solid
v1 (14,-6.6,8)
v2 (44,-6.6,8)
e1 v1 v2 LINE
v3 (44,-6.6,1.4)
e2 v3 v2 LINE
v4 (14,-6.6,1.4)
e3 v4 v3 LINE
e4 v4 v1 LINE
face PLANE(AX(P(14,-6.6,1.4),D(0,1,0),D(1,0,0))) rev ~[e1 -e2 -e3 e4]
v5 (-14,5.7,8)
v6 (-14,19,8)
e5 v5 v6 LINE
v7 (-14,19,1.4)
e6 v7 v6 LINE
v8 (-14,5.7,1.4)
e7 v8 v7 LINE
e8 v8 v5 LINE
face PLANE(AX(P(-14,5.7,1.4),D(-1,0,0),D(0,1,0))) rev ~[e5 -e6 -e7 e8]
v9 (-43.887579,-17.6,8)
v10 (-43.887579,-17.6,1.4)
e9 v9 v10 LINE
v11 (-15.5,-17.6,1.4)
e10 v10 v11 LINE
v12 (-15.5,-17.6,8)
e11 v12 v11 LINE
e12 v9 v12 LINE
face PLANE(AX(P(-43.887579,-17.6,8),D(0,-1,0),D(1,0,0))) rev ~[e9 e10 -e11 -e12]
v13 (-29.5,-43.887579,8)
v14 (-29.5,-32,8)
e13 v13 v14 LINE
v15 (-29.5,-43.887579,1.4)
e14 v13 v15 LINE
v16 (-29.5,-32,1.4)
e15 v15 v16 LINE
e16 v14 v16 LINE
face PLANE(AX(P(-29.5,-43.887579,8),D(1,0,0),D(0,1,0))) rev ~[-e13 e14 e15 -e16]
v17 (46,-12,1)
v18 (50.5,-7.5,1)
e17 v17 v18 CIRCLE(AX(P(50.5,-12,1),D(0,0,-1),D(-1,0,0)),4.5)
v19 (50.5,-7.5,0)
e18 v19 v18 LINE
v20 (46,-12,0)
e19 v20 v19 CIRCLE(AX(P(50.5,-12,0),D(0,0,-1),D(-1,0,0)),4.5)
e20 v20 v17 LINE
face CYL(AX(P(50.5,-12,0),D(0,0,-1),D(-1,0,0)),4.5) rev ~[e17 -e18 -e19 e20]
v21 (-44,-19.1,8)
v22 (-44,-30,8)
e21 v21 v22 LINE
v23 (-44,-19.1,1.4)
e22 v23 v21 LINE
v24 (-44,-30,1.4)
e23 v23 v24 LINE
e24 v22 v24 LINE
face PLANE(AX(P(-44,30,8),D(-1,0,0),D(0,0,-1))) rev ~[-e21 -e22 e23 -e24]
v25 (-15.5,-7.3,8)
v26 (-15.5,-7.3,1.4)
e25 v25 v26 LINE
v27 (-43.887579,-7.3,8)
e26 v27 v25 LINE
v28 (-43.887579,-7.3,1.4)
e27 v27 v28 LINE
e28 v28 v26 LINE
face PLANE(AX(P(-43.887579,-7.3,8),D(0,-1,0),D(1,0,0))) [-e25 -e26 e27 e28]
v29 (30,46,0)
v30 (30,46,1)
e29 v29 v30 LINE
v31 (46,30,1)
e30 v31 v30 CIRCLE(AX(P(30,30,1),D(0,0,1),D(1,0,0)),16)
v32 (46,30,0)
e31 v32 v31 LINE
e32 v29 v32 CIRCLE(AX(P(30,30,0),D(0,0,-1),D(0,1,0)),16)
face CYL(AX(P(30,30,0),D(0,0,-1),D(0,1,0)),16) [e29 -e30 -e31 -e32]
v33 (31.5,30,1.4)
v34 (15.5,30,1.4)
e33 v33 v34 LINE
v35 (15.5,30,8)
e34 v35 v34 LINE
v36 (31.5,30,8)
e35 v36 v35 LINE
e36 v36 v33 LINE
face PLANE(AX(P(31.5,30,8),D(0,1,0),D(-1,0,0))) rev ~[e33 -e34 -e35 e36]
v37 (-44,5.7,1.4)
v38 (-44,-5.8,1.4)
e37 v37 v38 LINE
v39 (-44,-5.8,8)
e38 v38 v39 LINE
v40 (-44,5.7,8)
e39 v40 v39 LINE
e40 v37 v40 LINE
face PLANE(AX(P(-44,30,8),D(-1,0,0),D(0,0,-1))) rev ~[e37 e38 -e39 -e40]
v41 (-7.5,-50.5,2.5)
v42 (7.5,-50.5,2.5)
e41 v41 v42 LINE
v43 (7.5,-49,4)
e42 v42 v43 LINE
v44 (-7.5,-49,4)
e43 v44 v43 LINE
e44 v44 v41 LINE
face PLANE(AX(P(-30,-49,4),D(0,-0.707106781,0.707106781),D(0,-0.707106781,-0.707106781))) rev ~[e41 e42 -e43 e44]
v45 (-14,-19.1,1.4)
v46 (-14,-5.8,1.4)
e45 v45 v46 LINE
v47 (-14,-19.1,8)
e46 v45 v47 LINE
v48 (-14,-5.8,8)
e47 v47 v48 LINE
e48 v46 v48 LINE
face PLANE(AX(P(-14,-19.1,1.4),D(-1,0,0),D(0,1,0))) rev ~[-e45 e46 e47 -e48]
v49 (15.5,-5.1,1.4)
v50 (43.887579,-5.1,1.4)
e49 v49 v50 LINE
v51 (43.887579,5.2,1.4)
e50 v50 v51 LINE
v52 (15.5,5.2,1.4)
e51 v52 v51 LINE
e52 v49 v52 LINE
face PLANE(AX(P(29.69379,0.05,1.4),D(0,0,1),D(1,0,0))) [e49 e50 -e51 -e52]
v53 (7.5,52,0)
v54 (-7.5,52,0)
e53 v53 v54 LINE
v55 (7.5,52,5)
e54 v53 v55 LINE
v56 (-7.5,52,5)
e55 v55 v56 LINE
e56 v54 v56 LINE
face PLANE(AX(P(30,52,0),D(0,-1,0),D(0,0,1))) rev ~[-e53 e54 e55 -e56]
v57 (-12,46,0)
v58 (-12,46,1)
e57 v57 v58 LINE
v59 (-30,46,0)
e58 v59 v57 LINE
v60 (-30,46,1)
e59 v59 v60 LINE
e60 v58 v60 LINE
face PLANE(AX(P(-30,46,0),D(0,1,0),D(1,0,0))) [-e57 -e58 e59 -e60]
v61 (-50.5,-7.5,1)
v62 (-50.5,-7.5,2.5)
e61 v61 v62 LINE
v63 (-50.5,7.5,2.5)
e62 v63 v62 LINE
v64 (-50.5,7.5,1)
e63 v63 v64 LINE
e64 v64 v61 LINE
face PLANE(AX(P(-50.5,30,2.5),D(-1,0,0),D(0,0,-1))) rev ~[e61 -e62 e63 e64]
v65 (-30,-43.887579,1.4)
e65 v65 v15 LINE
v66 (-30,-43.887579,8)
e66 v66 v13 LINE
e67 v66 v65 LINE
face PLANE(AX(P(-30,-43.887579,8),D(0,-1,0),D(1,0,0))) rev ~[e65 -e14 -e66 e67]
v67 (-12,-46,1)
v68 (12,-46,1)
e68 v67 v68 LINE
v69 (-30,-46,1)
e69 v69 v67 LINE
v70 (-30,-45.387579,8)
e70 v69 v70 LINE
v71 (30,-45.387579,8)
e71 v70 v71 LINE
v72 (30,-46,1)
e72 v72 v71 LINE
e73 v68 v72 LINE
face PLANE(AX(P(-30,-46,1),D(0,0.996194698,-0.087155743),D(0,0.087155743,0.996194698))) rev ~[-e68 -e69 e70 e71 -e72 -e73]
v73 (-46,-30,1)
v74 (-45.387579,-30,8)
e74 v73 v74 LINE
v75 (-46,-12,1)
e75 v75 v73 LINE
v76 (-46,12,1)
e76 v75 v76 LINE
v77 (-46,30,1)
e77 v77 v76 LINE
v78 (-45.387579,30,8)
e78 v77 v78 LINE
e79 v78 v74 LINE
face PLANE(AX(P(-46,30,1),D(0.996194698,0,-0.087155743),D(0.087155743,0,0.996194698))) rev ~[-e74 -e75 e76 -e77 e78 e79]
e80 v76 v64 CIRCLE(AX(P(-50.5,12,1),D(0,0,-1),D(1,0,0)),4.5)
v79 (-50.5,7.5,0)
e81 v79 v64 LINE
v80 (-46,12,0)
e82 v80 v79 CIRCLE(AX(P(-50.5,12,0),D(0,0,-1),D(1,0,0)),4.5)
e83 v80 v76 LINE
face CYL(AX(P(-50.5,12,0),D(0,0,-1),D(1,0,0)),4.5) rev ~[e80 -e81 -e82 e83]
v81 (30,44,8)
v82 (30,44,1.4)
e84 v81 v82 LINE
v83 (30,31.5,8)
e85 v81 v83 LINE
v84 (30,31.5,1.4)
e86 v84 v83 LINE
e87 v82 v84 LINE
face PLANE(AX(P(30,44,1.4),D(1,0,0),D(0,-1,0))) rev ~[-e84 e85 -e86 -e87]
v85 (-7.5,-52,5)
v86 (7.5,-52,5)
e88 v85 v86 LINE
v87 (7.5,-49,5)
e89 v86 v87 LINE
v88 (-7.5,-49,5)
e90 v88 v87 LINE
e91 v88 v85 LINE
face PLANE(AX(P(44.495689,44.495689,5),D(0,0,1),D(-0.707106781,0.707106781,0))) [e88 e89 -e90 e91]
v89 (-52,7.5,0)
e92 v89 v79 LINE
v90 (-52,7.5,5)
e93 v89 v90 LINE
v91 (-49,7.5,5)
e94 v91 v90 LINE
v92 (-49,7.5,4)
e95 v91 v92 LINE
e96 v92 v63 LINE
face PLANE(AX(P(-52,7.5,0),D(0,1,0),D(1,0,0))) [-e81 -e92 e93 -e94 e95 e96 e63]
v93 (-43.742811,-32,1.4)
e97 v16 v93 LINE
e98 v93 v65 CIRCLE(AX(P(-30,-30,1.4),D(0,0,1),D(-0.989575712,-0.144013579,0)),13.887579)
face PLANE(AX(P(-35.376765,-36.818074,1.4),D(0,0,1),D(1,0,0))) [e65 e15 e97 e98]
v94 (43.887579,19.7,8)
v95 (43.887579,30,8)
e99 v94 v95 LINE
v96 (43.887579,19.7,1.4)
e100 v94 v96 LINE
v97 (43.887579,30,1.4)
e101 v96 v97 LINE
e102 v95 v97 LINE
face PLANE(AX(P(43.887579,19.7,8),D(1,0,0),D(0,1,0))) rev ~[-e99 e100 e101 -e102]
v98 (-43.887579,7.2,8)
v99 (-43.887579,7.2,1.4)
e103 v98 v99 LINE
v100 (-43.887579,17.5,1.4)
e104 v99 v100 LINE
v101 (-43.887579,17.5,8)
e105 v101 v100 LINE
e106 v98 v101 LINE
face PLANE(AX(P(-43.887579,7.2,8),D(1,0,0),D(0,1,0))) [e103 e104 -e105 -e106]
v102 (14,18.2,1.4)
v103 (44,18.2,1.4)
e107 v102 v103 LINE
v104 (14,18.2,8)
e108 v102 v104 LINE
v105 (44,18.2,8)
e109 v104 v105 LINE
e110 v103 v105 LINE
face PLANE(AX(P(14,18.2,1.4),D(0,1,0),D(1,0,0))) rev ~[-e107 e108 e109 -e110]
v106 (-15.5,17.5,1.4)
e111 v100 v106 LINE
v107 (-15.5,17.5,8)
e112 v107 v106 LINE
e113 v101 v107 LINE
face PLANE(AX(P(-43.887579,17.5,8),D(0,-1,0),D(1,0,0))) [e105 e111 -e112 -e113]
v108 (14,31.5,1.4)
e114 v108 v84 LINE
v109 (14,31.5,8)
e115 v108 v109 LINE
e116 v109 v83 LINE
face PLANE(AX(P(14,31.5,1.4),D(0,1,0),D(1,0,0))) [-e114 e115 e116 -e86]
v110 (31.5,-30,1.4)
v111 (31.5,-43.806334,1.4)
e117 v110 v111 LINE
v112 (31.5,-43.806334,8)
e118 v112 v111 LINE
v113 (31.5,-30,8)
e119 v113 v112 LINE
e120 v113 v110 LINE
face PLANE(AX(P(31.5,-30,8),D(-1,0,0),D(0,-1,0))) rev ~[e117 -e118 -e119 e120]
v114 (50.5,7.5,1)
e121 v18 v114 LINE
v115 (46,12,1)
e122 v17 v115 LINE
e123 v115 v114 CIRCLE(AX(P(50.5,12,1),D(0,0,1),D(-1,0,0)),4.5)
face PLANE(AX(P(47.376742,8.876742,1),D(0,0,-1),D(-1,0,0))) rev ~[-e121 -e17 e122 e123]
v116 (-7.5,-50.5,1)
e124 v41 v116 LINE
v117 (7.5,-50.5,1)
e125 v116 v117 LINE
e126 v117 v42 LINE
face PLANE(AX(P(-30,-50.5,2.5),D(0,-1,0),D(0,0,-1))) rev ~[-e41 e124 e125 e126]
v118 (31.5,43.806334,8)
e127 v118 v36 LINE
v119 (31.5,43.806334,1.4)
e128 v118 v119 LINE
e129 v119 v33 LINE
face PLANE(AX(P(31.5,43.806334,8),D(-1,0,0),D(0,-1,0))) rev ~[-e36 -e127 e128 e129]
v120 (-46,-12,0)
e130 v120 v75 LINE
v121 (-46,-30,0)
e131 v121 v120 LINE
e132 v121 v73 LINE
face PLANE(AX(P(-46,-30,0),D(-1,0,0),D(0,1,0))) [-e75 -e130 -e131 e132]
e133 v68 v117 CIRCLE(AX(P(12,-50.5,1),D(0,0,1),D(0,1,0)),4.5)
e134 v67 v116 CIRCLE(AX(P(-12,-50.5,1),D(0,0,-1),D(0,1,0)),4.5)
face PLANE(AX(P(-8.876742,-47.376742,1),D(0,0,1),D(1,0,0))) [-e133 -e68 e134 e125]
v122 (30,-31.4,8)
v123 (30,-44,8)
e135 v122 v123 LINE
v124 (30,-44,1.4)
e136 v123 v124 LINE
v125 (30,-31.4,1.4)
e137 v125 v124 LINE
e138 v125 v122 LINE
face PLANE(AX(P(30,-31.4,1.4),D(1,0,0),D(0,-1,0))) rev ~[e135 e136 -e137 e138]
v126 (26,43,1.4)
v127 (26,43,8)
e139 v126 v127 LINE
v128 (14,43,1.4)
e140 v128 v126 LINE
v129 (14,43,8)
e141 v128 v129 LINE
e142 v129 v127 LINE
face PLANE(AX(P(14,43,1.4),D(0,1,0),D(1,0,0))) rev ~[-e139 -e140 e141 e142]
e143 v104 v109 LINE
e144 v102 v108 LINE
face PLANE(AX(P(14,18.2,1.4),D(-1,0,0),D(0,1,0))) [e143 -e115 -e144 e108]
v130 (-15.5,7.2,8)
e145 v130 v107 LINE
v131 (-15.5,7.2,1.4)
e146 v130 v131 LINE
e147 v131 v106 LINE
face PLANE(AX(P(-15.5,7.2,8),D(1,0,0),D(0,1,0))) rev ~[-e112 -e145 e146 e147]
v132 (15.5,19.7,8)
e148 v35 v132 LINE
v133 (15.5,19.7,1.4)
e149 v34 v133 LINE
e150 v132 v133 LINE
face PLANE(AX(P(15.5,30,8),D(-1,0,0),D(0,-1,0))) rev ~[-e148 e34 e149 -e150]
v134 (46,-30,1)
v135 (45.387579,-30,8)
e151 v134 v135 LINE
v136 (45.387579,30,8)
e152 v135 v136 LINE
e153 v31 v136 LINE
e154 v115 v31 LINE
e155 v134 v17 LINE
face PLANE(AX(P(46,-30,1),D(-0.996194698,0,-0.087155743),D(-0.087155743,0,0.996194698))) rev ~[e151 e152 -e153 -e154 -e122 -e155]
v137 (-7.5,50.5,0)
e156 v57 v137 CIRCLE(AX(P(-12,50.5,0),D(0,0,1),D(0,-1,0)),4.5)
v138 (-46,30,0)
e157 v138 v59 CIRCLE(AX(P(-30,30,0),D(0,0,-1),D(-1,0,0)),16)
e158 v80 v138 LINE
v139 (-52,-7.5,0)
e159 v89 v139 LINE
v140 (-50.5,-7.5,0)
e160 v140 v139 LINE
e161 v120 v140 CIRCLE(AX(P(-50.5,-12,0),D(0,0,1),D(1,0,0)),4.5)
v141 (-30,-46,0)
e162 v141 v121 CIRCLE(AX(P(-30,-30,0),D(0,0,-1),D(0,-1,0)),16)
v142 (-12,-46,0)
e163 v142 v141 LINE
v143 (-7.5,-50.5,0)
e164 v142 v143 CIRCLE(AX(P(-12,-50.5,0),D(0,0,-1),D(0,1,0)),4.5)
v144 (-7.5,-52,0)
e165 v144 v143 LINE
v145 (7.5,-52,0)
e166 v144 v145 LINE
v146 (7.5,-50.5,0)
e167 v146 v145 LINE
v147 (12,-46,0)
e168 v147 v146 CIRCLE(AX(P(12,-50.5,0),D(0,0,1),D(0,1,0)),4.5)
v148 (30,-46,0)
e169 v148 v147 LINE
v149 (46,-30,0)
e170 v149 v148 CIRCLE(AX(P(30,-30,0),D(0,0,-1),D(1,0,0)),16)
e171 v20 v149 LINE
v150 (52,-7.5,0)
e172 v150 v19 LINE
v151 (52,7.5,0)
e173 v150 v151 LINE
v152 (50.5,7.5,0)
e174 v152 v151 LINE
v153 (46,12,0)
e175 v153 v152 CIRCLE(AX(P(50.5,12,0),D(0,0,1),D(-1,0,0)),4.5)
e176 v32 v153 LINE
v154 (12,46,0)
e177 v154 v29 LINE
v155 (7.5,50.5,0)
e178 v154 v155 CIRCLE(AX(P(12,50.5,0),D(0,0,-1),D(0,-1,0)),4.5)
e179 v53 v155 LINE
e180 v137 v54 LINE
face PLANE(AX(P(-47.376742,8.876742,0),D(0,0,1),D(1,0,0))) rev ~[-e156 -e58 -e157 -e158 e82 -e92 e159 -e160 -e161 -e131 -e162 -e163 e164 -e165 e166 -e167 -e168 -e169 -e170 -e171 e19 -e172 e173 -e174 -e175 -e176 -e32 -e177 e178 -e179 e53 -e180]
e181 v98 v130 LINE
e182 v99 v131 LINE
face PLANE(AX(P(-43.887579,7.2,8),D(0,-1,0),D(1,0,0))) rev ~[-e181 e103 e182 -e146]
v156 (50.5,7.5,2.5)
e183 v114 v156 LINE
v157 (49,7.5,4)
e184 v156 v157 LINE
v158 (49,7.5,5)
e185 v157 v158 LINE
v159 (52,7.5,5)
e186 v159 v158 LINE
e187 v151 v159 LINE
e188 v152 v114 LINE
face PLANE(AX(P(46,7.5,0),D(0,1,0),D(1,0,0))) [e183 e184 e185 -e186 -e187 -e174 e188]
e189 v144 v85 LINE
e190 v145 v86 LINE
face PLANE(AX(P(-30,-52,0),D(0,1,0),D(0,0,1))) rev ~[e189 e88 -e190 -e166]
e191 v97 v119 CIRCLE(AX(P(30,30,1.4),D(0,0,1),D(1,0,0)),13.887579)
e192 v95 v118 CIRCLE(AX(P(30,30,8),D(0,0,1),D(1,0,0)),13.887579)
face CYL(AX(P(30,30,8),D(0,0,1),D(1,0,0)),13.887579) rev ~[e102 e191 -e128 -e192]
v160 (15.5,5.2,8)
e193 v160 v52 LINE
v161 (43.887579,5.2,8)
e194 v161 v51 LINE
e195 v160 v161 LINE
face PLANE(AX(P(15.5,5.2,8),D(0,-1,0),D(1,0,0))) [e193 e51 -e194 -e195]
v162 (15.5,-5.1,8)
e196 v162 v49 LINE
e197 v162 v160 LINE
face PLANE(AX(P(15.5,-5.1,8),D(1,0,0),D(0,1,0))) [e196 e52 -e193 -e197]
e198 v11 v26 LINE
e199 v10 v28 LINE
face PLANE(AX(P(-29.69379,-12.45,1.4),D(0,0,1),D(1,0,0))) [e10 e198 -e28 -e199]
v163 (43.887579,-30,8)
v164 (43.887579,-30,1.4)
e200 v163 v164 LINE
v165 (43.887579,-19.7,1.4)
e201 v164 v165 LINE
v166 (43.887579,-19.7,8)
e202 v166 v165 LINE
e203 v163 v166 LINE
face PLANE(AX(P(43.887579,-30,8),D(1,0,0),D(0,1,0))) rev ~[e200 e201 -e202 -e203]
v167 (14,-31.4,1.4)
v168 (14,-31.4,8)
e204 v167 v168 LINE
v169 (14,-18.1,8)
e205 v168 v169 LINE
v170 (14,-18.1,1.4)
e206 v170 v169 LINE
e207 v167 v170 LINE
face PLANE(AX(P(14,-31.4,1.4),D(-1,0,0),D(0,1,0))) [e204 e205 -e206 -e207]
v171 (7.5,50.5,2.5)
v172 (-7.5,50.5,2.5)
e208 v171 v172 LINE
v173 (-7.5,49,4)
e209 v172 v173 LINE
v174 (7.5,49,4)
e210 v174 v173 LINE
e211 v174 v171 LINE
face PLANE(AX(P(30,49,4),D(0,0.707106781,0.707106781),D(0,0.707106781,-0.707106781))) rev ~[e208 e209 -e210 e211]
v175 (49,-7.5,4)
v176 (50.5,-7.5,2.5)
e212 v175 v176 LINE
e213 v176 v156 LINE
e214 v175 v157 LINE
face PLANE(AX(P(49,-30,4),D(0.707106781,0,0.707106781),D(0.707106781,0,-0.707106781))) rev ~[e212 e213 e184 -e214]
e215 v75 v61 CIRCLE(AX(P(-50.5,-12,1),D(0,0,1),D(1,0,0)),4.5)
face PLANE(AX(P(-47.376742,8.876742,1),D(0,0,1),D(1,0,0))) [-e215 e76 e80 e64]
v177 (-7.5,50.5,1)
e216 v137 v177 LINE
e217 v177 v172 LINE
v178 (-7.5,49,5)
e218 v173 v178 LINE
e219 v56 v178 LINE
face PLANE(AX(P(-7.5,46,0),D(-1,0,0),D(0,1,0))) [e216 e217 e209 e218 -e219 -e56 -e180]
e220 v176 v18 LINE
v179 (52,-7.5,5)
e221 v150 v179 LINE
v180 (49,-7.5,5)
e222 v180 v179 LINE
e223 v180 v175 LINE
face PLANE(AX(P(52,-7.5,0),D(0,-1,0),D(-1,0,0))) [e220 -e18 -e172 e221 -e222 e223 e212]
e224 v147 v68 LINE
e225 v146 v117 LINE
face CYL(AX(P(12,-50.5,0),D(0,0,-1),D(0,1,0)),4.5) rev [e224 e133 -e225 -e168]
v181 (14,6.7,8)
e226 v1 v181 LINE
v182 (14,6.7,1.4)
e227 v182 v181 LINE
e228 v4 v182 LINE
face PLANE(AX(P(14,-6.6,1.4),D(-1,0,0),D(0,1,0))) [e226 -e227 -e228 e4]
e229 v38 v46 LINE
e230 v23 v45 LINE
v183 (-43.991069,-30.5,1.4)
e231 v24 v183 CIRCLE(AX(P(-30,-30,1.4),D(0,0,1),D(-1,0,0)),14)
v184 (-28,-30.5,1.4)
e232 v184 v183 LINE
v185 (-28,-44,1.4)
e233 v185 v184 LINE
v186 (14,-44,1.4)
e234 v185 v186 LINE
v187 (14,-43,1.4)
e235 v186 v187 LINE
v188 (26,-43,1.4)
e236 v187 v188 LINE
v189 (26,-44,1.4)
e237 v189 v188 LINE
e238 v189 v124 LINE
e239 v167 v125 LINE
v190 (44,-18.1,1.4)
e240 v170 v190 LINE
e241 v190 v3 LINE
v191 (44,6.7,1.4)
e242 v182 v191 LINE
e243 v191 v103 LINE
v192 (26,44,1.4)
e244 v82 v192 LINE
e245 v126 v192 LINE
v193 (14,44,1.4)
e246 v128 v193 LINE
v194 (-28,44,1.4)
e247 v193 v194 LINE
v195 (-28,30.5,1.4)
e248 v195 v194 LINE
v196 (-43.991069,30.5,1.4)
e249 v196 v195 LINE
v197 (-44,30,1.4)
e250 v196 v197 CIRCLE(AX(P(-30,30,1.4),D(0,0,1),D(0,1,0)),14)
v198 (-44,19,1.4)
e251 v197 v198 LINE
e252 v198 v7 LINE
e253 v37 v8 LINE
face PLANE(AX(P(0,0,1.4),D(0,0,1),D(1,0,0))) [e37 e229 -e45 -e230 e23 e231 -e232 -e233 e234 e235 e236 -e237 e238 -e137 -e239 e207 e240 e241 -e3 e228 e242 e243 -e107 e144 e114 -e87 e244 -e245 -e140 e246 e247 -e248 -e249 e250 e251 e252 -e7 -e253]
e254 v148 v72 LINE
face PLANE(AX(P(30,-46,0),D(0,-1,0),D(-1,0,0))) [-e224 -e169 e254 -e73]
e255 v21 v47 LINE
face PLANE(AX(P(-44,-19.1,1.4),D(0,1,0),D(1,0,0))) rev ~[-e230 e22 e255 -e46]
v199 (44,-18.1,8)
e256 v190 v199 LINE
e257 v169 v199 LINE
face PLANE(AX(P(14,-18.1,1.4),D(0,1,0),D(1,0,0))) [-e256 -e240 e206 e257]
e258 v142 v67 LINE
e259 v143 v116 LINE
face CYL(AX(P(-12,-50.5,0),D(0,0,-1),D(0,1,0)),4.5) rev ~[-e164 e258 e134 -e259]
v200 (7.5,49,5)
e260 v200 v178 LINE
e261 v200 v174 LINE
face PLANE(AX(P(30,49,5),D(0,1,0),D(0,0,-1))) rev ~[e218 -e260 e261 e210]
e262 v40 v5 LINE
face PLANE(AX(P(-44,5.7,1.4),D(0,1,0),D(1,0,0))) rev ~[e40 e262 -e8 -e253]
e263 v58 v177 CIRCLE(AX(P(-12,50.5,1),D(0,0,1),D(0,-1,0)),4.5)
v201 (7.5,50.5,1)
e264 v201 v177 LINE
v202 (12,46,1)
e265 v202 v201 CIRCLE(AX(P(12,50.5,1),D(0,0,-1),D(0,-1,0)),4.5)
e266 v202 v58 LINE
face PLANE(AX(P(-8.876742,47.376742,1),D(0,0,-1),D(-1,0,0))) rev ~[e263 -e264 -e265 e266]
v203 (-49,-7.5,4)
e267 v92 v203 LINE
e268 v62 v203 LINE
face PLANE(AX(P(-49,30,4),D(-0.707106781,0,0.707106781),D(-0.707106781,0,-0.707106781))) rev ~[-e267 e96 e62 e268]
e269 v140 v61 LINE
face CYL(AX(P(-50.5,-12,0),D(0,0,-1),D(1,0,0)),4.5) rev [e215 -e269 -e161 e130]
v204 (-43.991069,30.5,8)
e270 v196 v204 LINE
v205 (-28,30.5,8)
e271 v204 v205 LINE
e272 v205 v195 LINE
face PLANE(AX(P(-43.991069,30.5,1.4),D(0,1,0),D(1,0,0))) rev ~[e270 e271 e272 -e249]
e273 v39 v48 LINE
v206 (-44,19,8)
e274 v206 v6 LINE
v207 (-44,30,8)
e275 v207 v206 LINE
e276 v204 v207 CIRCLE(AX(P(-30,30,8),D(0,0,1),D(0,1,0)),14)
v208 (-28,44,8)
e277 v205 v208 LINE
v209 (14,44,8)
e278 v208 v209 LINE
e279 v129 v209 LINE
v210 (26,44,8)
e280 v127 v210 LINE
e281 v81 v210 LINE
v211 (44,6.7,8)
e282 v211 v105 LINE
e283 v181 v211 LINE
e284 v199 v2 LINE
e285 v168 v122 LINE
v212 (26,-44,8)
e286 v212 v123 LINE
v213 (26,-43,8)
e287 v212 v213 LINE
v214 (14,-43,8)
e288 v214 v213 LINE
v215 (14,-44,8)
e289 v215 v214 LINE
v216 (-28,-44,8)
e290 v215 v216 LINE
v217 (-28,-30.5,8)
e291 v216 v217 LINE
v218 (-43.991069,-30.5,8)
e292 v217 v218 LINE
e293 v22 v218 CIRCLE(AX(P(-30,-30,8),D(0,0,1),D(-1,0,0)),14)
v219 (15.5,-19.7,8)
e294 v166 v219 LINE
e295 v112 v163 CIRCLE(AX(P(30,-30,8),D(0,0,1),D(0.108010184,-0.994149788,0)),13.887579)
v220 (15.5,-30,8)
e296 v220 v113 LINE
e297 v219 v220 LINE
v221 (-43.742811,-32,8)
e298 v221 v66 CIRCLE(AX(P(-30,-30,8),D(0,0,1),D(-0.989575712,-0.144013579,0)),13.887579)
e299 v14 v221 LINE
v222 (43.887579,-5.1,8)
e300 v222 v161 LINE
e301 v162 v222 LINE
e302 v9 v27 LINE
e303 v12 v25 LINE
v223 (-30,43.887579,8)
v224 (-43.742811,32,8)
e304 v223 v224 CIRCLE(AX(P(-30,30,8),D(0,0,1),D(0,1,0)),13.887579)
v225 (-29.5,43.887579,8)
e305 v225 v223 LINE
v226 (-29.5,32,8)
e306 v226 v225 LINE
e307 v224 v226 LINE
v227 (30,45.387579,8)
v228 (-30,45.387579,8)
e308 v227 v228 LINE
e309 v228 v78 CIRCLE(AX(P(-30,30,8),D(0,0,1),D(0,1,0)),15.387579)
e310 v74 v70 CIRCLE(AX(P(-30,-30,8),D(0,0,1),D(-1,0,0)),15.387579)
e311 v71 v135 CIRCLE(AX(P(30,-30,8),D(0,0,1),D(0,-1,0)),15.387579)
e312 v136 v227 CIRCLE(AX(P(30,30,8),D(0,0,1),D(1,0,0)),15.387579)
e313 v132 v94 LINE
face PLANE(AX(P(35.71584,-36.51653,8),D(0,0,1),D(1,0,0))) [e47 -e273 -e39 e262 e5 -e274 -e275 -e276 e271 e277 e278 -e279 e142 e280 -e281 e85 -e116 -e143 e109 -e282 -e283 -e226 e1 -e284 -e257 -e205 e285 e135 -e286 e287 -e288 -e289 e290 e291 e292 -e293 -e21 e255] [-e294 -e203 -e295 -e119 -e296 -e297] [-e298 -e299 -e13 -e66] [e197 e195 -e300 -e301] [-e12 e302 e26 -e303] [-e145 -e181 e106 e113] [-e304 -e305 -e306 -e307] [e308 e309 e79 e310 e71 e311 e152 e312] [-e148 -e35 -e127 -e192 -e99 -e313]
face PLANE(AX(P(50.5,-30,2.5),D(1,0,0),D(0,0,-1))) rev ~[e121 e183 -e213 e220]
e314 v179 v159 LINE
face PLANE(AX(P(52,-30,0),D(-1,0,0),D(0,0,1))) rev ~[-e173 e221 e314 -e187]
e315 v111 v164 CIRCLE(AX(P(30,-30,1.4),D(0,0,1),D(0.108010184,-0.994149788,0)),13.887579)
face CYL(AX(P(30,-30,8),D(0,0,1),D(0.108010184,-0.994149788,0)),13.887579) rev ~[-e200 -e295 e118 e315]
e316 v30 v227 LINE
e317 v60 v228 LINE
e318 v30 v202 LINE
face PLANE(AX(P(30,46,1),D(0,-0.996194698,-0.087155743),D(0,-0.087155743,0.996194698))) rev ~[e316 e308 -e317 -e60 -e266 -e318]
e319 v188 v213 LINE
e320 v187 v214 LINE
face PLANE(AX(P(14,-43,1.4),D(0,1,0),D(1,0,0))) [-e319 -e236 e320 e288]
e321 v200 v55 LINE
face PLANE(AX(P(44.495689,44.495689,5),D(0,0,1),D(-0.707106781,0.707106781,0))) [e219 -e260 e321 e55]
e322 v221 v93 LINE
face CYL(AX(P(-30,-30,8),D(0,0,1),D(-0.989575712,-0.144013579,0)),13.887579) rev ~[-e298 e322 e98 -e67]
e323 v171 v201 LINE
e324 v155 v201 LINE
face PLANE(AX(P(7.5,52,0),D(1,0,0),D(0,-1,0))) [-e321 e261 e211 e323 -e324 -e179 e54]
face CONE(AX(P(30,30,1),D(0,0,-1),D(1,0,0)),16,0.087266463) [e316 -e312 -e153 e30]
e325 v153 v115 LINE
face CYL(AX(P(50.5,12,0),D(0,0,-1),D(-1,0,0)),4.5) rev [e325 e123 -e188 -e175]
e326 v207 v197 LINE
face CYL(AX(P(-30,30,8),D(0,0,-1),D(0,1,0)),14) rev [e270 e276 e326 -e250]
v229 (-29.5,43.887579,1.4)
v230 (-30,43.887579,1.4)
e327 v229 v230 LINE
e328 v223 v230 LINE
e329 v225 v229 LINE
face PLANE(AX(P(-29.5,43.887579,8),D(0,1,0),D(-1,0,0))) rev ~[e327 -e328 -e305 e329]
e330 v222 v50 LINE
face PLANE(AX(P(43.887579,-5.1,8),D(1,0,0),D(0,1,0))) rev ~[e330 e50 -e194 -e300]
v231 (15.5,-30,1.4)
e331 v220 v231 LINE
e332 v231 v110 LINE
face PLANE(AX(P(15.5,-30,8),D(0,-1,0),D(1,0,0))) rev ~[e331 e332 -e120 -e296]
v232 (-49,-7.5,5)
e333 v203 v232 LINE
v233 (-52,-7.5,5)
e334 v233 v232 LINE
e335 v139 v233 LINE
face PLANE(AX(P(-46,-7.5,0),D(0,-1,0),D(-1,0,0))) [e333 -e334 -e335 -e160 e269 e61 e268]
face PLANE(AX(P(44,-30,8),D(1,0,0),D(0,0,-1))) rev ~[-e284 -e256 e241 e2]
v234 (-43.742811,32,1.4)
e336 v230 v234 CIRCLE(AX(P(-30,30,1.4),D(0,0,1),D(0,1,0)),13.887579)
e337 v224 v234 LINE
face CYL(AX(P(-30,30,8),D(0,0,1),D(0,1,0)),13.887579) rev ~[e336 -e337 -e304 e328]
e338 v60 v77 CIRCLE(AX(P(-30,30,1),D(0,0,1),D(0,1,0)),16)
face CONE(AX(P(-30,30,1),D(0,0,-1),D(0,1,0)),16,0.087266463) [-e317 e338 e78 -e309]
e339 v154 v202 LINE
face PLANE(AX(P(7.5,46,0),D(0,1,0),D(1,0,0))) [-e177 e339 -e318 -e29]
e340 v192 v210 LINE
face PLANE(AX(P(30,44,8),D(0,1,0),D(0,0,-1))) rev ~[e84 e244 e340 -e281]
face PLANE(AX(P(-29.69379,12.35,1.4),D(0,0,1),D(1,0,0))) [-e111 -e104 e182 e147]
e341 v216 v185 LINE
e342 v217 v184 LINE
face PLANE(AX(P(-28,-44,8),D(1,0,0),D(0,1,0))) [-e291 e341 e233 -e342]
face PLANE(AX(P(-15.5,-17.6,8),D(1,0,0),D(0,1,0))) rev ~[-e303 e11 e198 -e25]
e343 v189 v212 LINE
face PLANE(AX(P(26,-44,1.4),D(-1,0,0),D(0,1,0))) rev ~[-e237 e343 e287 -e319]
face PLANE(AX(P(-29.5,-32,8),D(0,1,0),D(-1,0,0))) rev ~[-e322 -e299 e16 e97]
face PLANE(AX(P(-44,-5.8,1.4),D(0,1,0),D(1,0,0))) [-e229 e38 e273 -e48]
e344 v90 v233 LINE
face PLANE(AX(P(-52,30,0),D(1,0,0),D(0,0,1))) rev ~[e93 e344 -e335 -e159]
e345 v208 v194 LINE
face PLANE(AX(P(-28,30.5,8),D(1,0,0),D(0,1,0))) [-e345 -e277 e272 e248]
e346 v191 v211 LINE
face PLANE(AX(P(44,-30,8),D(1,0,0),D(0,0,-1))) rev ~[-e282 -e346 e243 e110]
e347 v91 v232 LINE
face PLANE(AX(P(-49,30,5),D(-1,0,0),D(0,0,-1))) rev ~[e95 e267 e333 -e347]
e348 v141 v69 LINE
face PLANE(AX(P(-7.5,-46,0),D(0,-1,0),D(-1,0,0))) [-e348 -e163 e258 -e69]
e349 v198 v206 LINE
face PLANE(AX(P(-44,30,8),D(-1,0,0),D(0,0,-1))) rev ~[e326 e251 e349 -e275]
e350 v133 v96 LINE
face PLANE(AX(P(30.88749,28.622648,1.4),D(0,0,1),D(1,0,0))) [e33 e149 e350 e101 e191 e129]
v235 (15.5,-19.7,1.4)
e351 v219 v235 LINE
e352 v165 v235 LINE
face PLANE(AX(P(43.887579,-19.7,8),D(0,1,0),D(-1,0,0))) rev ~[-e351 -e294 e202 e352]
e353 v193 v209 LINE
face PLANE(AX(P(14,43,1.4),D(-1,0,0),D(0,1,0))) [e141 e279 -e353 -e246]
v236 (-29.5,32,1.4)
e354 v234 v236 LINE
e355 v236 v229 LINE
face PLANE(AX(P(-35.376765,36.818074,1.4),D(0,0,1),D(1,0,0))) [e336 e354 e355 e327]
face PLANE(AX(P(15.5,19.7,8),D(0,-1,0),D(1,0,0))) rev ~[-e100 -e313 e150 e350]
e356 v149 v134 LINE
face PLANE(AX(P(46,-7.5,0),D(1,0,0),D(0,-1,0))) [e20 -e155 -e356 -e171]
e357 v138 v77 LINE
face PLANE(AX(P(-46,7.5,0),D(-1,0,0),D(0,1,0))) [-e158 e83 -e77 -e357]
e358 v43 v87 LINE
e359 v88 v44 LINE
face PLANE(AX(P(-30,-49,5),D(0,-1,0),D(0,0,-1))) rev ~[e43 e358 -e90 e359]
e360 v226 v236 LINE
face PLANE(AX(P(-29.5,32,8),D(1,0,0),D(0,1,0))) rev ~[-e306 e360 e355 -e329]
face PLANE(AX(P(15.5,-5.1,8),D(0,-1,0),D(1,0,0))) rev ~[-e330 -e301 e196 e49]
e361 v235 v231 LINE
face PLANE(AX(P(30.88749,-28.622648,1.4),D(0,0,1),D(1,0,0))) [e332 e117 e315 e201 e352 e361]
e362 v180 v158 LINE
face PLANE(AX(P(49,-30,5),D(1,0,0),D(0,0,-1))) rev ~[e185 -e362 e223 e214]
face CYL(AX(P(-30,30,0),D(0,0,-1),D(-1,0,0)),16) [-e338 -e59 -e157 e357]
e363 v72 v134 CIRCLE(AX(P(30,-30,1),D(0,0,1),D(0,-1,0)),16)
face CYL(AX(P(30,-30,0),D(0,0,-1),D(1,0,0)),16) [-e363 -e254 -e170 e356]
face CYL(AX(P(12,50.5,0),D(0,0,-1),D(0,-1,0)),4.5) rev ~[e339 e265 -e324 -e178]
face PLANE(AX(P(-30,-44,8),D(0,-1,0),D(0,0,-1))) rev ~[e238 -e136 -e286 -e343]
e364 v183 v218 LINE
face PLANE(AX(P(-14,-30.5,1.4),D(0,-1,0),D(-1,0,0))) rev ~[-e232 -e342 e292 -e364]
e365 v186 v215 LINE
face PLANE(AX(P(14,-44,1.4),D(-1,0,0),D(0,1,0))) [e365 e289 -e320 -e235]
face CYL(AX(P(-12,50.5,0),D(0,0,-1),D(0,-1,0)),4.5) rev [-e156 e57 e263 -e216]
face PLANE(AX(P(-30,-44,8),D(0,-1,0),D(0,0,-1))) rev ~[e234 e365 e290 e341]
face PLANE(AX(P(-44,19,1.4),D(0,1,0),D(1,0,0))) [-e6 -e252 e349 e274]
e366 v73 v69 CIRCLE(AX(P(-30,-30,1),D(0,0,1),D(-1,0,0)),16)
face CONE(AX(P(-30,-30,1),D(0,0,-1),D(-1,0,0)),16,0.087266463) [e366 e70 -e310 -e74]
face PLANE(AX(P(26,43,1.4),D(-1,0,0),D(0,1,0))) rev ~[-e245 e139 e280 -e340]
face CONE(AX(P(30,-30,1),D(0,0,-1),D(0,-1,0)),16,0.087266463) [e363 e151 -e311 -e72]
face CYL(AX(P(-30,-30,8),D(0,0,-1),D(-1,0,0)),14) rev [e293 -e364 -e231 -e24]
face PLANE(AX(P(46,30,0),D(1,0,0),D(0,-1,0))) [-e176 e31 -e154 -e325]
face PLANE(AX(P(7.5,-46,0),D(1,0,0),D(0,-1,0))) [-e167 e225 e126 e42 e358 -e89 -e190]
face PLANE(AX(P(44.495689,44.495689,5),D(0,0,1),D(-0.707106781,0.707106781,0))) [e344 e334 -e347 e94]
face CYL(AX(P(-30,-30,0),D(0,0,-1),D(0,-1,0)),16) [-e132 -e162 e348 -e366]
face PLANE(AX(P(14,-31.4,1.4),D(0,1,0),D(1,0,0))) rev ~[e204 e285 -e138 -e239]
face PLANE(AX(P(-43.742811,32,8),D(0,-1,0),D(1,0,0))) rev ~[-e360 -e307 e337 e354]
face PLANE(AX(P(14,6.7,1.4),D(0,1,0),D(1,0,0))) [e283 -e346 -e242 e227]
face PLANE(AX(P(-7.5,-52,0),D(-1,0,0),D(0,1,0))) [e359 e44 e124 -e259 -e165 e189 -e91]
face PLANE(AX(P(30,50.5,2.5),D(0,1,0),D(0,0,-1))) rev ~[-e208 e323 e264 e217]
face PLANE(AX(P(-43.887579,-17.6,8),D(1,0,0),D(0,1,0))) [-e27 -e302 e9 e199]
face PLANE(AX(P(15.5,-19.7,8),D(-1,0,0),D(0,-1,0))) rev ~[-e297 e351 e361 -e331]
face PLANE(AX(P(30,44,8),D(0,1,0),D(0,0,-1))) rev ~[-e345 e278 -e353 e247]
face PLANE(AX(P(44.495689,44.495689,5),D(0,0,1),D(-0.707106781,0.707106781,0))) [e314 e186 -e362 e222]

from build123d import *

# Parameters (mm, degrees)
F4_DEPTH     = 1.4
F5_W         = 30
F5_H         = 13.3
F5_W_2       = 12
F5_H_2       = 1
F6_DEPTH     = 6.6
F8_DEPTH     = 6.6
F9_W         = 14
F9_H         = 13.5
F10_DEPTH    = 6.6
F11_W        = 28.3875793553
F11_H        = 10.3
F12_DEPTH    = 6.6
F14_DEPTH    = 5.001
F15_T1_DEPTH = 1


# Not quite as in the source:
# - a fillet or chamfer that OpenCascade refuses, or shapes differently, is made with other operations: its cross-section is extruded or revolved along the edge and cut away or added


with BuildPart() as f2:
    # F2: sweep along a path in F0
    with BuildLine(Plane.XY) as f2_path:
        ThreePointArc((52, 30), (45.5563491861, 45.5563491861), (30, 52))
        Line((30, 52), (0, 52))
        Line((0, 52), (-30, 52))
        ThreePointArc((-30, 52), (-45.5563491861, 45.5563491861), (-52, 30))
        Line((-52, 30), (-52, 0))
        Line((-52, 0), (-52, -30))
        ThreePointArc((-52, -30), (-45.5563491861, -45.5563491861), (-30, -52))
        Line((-30, -52), (0, -52))
        Line((0, -52), (30, -52))
        ThreePointArc((30, -52), (45.5563491861, -45.5563491861), (52, -30))
        Line((52, -30), (52, 0))
        Line((52, 0), (52, 30))
    # F1 (on Front) → F2 (sweep)
    with BuildSketch(Plane.XZ):
        Polygon((44, 8), (44, 0), (52, 0), (52, 1), (52, 5), (49, 5), (49, 4), (50.5, 2.5), (50.5, 1), (46, 1), (45.3875793553, 8), align=None)
    sweep(path=f2_path.line)

    # F3 (on Top) → F4 (join)
    with BuildSketch(Plane.XY):
        with BuildLine():
            ThreePointArc((-44, -30), (-39.8994949366, -39.8994949366), (-30, -44))
            Line((-30, -44), (30, -44))
            ThreePointArc((30, -44), (39.8994949366, -39.8994949366), (44, -30))
            Line((44, -30), (44, 30))
            ThreePointArc((44, 30), (39.8994949366, 39.8994949366), (30, 44))
            Line((30, 44), (-30, 44))
            ThreePointArc((-30, 44), (-39.8994949366, 39.8994949366), (-44, 30))
            Line((-44, 30), (-44, -30))
        make_face()
    extrude(amount=F4_DEPTH)

    # F5 (on face) → F6 (join, through all)
    with BuildSketch(Plane.XY.offset(1.4)):
        with Locations((29, 24.85)):
            Rectangle(F5_W, F5_H)
        with Locations((20, 43.5)):
            Rectangle(F5_W_2, F5_H_2)
        with Locations((29, 0.05)):
            Rectangle(F5_W, F5_H)
        with Locations((29, -24.75)):
            Rectangle(F5_W, F5_H)
        with Locations((20, -43.5)):
            Rectangle(F5_W_2, F5_H_2)
        with BuildLine():
            ThreePointArc((-30, 44), (-39.7211110476, 40.0747208398), (-43.9910685796, 30.5))
            Line((-43.9910685796, 30.5), (-14, 30.5))
            Line((-14, 30.5), (-14, 44))
            Line((-14, 44), (-30, 44))
        make_face()
        with BuildLine():
            Line((-43.9910685796, 30.5), (-44, 30.5))
            Line((-44, 30.5), (-44, 30))
            ThreePointArc((-44, 30), (-43.9977669668, 30.250039882), (-43.9910685796, 30.5))
        make_face()
        with BuildLine():
            Line((-44, -30.5), (-43.9910685796, -30.5))
            ThreePointArc((-43.9910685796, -30.5), (-43.9977669668, -30.250039882), (-44, -30))
            Line((-44, -30), (-44, -30.5))
        make_face()
        with BuildLine():
            Line((-30, -44), (-14, -44))
            Line((-14, -44), (-14, -30.5))
            Line((-14, -30.5), (-43.9910685796, -30.5))
            ThreePointArc((-43.9910685796, -30.5), (-39.7211110476, -40.0747208398), (-30, -44))
        make_face()
        with Locations((-29, 12.35)):
            Rectangle(F5_W, F5_H)
        with Locations((-29, -12.45)):
            Rectangle(F5_W, F5_H)
    extrude(amount=F6_DEPTH)

    # F7 (on face) → F8 (join, through all)
    with BuildSketch(Plane.XY.offset(1.4)):
        with BuildLine():
            Line((43.9298241195, -31.4), (30, -31.4))
            Line((30, -31.4), (30, -44))
            ThreePointArc((30, -44), (39.3914855055, -40.3826778819), (43.9298241195, -31.4))
        make_face()
        with BuildLine():
            ThreePointArc((43.9194109071, 31.5), (39.3541434669, 40.416333328), (30, 44))
            Line((30, 44), (30, 31.5))
            Line((30, 31.5), (43.9194109071, 31.5))
        make_face()
    extrude(amount=F8_DEPTH)

    # F9 (on face) → F10 (cut, through all)
    with BuildSketch(Plane.XY.offset(8)):
        with Locations((-21, 37.25)):
            Rectangle(F9_W, F9_H)
        with Locations((-21, -37.25)):
            Rectangle(F9_W, F9_H)
    extrude(amount=-F10_DEPTH, mode=Mode.SUBTRACT)

    # F11 (on face) → F12 (cut, through all)
    with BuildSketch(Plane.XY.offset(8)):
        with BuildLine():
            Line((-43.7428112244, 32), (-29.5, 32))
            Line((-29.5, 32), (-29.5, 43.8875793553))
            Line((-29.5, 43.8875793553), (-30, 43.8875793553))
            ThreePointArc((-30, 43.8875793553), (-39.0854196832, 40.5033332581), (-43.7428112244, 32))
        make_face()
        with BuildLine():
            Line((15.5, 19.6999999465), (43.8875793553, 19.6999999465))
            Line((43.8875793553, 19.6999999465), (43.8875793553, 29.9999999465))
            ThreePointArc((43.8875793553, 30), (40.3367361721, 39.274521317), (31.5, 43.8063340663))
            Line((31.5, 43.8063340663), (31.5, 29.9999999465))
            Line((31.5, 29.9999999465), (15.5, 29.9999999465))
            Line((15.5, 29.9999999465), (15.5, 19.6999999465))
        make_face()
        with Locations((29.6937896777, 0.05)):
            Rectangle(F11_W, F11_H)
        with BuildLine():
            Line((31.5, -29.9999999465), (31.5, -43.8063340663))
            ThreePointArc((31.5, -43.8063340663), (40.3367361721, -39.274521317), (43.8875793553, -30))
            Line((43.8875793553, -29.9999999465), (43.8875793553, -29.9))
            Line((43.8875793553, -29.9), (43.8875793553, -19.6999999465))
            Line((43.8875793553, -19.6999999465), (15.5, -19.6999999465))
            Line((15.5, -19.6999999465), (15.5, -29.9))
            Line((15.5, -29.9), (15.5, -29.9999999465))
            Line((15.5, -29.9999999465), (31.5, -29.9999999465))
        make_face()
        with Locations((-29.6937896777, 12.35)):
            Rectangle(F11_W, F11_H)
        with Locations((-29.6937896777, -12.45)):
            Rectangle(F11_W, F11_H)
        with BuildLine():
            Line((-29.5, -32), (-43.7428112244, -32))
            ThreePointArc((-43.7428112244, -32), (-39.0854196832, -40.5033332581), (-30, -43.8875793553))
            Line((-30, -43.8875793553), (-29.5, -43.8875793553))
            Line((-29.5, -43.8875793553), (-29.5, -32))
        make_face()
    extrude(amount=-F12_DEPTH, mode=Mode.SUBTRACT)

    # F13 (on Top) → F14 (cut, through all)
    with BuildSketch(Plane.XY):
        with BuildLine():
            Line((52, -30), (52, -7.5))
            Line((52, -7.5), (46, -7.5))
            Line((46, -7.5), (46, -30))
            ThreePointArc((46, -30), (41.313708499, -41.313708499), (30, -46))
            Line((30, -46), (7.5, -46))
            Line((7.5, -46), (7.5, -52))
            Line((7.5, -52), (30, -52))
            ThreePointArc((30, -52), (45.5563491861, -45.5563491861), (52, -30))
        make_face()
        with BuildLine():
            Line((-30, -52), (-7.5, -52))
            Line((-7.5, -52), (-7.5, -46))
            Line((-7.5, -46), (-30, -46))
            ThreePointArc((-30, -46), (-41.313708499, -41.313708499), (-46, -30))
            Line((-46, -30), (-46, -7.5))
            Line((-46, -7.5), (-52, -7.5))
            Line((-52, -7.5), (-52, -30))
            ThreePointArc((-52, -30), (-45.5563491861, -45.5563491861), (-30, -52))
        make_face()
        with BuildLine():
            Line((-7.5, 46), (-7.5, 52))
            Line((-7.5, 52), (-30, 52))
            ThreePointArc((-30, 52), (-45.5563491861, 45.5563491861), (-52, 30))
            Line((-52, 30), (-52, 7.5))
            Line((-52, 7.5), (-46, 7.5))
            Line((-46, 7.5), (-46, 30))
            ThreePointArc((-46, 30), (-41.313708499, 41.313708499), (-30, 46))
            Line((-30, 46), (-7.5, 46))
        make_face()
        with BuildLine():
            ThreePointArc((30, 46), (41.313708499, 41.313708499), (46, 30))
            Line((46, 30), (46, 7.5))
            Line((46, 7.5), (52, 7.5))
            Line((52, 7.5), (52, 30))
            ThreePointArc((52, 30), (45.5563491861, 45.5563491861), (30, 52))
            Line((30, 52), (7.5, 52))
            Line((7.5, 52), (7.5, 46))
            Line((7.5, 46), (30, 46))
        make_face()
    extrude(amount=F14_DEPTH, mode=Mode.SUBTRACT)

    # F15: fillet of radius 4.5 on 8 edges, made by hand

    # F15_s2 → F15_t1 (join)
    with BuildSketch(Plane.XY):
        with BuildLine():
            ThreePointArc((-46, 12), (-47.3180194847, 8.8180194847), (-50.5, 7.5))
            Line((-50.5, 7.5), (-46, 7.5))
            Line((-46, 7.5), (-46, 12))
        make_face()
        with BuildLine():
            ThreePointArc((-12, 46), (-8.8180194847, 47.3180194847), (-7.5, 50.5))
            Line((-7.5, 50.5), (-7.5, 46))
            Line((-7.5, 46), (-12, 46))
        make_face()
        with BuildLine():
            ThreePointArc((12, 46), (8.8180194847, 47.3180194847), (7.5, 50.5))
            Line((7.5, 50.5), (7.5, 46))
            Line((7.5, 46), (12, 46))
        make_face()
        with BuildLine():
            ThreePointArc((12, -46), (8.8180194847, -47.3180194847), (7.5, -50.5))
            Line((7.5, -50.5), (7.5, -46))
            Line((7.5, -46), (12, -46))
        make_face()
        with BuildLine():
            ThreePointArc((-12, -46), (-8.8180194847, -47.3180194847), (-7.5, -50.5))
            Line((-7.5, -50.5), (-7.5, -46))
            Line((-7.5, -46), (-12, -46))
        make_face()
        with BuildLine():
            ThreePointArc((-46, -12), (-47.3180194847, -8.8180194847), (-50.5, -7.5))
            Line((-50.5, -7.5), (-46, -7.5))
            Line((-46, -7.5), (-46, -12))
        make_face()
        with BuildLine():
            ThreePointArc((46, -12), (47.3180194847, -8.8180194847), (50.5, -7.5))
            Line((50.5, -7.5), (46, -7.5))
            Line((46, -7.5), (46, -12))
        make_face()
        with BuildLine():
            ThreePointArc((46, 12), (47.3180194847, 8.8180194847), (50.5, 7.5))
            Line((50.5, 7.5), (46, 7.5))
            Line((46, 7.5), (46, 12))
        make_face()
    extrude(amount=F15_T1_DEPTH)


solid = f2.part
